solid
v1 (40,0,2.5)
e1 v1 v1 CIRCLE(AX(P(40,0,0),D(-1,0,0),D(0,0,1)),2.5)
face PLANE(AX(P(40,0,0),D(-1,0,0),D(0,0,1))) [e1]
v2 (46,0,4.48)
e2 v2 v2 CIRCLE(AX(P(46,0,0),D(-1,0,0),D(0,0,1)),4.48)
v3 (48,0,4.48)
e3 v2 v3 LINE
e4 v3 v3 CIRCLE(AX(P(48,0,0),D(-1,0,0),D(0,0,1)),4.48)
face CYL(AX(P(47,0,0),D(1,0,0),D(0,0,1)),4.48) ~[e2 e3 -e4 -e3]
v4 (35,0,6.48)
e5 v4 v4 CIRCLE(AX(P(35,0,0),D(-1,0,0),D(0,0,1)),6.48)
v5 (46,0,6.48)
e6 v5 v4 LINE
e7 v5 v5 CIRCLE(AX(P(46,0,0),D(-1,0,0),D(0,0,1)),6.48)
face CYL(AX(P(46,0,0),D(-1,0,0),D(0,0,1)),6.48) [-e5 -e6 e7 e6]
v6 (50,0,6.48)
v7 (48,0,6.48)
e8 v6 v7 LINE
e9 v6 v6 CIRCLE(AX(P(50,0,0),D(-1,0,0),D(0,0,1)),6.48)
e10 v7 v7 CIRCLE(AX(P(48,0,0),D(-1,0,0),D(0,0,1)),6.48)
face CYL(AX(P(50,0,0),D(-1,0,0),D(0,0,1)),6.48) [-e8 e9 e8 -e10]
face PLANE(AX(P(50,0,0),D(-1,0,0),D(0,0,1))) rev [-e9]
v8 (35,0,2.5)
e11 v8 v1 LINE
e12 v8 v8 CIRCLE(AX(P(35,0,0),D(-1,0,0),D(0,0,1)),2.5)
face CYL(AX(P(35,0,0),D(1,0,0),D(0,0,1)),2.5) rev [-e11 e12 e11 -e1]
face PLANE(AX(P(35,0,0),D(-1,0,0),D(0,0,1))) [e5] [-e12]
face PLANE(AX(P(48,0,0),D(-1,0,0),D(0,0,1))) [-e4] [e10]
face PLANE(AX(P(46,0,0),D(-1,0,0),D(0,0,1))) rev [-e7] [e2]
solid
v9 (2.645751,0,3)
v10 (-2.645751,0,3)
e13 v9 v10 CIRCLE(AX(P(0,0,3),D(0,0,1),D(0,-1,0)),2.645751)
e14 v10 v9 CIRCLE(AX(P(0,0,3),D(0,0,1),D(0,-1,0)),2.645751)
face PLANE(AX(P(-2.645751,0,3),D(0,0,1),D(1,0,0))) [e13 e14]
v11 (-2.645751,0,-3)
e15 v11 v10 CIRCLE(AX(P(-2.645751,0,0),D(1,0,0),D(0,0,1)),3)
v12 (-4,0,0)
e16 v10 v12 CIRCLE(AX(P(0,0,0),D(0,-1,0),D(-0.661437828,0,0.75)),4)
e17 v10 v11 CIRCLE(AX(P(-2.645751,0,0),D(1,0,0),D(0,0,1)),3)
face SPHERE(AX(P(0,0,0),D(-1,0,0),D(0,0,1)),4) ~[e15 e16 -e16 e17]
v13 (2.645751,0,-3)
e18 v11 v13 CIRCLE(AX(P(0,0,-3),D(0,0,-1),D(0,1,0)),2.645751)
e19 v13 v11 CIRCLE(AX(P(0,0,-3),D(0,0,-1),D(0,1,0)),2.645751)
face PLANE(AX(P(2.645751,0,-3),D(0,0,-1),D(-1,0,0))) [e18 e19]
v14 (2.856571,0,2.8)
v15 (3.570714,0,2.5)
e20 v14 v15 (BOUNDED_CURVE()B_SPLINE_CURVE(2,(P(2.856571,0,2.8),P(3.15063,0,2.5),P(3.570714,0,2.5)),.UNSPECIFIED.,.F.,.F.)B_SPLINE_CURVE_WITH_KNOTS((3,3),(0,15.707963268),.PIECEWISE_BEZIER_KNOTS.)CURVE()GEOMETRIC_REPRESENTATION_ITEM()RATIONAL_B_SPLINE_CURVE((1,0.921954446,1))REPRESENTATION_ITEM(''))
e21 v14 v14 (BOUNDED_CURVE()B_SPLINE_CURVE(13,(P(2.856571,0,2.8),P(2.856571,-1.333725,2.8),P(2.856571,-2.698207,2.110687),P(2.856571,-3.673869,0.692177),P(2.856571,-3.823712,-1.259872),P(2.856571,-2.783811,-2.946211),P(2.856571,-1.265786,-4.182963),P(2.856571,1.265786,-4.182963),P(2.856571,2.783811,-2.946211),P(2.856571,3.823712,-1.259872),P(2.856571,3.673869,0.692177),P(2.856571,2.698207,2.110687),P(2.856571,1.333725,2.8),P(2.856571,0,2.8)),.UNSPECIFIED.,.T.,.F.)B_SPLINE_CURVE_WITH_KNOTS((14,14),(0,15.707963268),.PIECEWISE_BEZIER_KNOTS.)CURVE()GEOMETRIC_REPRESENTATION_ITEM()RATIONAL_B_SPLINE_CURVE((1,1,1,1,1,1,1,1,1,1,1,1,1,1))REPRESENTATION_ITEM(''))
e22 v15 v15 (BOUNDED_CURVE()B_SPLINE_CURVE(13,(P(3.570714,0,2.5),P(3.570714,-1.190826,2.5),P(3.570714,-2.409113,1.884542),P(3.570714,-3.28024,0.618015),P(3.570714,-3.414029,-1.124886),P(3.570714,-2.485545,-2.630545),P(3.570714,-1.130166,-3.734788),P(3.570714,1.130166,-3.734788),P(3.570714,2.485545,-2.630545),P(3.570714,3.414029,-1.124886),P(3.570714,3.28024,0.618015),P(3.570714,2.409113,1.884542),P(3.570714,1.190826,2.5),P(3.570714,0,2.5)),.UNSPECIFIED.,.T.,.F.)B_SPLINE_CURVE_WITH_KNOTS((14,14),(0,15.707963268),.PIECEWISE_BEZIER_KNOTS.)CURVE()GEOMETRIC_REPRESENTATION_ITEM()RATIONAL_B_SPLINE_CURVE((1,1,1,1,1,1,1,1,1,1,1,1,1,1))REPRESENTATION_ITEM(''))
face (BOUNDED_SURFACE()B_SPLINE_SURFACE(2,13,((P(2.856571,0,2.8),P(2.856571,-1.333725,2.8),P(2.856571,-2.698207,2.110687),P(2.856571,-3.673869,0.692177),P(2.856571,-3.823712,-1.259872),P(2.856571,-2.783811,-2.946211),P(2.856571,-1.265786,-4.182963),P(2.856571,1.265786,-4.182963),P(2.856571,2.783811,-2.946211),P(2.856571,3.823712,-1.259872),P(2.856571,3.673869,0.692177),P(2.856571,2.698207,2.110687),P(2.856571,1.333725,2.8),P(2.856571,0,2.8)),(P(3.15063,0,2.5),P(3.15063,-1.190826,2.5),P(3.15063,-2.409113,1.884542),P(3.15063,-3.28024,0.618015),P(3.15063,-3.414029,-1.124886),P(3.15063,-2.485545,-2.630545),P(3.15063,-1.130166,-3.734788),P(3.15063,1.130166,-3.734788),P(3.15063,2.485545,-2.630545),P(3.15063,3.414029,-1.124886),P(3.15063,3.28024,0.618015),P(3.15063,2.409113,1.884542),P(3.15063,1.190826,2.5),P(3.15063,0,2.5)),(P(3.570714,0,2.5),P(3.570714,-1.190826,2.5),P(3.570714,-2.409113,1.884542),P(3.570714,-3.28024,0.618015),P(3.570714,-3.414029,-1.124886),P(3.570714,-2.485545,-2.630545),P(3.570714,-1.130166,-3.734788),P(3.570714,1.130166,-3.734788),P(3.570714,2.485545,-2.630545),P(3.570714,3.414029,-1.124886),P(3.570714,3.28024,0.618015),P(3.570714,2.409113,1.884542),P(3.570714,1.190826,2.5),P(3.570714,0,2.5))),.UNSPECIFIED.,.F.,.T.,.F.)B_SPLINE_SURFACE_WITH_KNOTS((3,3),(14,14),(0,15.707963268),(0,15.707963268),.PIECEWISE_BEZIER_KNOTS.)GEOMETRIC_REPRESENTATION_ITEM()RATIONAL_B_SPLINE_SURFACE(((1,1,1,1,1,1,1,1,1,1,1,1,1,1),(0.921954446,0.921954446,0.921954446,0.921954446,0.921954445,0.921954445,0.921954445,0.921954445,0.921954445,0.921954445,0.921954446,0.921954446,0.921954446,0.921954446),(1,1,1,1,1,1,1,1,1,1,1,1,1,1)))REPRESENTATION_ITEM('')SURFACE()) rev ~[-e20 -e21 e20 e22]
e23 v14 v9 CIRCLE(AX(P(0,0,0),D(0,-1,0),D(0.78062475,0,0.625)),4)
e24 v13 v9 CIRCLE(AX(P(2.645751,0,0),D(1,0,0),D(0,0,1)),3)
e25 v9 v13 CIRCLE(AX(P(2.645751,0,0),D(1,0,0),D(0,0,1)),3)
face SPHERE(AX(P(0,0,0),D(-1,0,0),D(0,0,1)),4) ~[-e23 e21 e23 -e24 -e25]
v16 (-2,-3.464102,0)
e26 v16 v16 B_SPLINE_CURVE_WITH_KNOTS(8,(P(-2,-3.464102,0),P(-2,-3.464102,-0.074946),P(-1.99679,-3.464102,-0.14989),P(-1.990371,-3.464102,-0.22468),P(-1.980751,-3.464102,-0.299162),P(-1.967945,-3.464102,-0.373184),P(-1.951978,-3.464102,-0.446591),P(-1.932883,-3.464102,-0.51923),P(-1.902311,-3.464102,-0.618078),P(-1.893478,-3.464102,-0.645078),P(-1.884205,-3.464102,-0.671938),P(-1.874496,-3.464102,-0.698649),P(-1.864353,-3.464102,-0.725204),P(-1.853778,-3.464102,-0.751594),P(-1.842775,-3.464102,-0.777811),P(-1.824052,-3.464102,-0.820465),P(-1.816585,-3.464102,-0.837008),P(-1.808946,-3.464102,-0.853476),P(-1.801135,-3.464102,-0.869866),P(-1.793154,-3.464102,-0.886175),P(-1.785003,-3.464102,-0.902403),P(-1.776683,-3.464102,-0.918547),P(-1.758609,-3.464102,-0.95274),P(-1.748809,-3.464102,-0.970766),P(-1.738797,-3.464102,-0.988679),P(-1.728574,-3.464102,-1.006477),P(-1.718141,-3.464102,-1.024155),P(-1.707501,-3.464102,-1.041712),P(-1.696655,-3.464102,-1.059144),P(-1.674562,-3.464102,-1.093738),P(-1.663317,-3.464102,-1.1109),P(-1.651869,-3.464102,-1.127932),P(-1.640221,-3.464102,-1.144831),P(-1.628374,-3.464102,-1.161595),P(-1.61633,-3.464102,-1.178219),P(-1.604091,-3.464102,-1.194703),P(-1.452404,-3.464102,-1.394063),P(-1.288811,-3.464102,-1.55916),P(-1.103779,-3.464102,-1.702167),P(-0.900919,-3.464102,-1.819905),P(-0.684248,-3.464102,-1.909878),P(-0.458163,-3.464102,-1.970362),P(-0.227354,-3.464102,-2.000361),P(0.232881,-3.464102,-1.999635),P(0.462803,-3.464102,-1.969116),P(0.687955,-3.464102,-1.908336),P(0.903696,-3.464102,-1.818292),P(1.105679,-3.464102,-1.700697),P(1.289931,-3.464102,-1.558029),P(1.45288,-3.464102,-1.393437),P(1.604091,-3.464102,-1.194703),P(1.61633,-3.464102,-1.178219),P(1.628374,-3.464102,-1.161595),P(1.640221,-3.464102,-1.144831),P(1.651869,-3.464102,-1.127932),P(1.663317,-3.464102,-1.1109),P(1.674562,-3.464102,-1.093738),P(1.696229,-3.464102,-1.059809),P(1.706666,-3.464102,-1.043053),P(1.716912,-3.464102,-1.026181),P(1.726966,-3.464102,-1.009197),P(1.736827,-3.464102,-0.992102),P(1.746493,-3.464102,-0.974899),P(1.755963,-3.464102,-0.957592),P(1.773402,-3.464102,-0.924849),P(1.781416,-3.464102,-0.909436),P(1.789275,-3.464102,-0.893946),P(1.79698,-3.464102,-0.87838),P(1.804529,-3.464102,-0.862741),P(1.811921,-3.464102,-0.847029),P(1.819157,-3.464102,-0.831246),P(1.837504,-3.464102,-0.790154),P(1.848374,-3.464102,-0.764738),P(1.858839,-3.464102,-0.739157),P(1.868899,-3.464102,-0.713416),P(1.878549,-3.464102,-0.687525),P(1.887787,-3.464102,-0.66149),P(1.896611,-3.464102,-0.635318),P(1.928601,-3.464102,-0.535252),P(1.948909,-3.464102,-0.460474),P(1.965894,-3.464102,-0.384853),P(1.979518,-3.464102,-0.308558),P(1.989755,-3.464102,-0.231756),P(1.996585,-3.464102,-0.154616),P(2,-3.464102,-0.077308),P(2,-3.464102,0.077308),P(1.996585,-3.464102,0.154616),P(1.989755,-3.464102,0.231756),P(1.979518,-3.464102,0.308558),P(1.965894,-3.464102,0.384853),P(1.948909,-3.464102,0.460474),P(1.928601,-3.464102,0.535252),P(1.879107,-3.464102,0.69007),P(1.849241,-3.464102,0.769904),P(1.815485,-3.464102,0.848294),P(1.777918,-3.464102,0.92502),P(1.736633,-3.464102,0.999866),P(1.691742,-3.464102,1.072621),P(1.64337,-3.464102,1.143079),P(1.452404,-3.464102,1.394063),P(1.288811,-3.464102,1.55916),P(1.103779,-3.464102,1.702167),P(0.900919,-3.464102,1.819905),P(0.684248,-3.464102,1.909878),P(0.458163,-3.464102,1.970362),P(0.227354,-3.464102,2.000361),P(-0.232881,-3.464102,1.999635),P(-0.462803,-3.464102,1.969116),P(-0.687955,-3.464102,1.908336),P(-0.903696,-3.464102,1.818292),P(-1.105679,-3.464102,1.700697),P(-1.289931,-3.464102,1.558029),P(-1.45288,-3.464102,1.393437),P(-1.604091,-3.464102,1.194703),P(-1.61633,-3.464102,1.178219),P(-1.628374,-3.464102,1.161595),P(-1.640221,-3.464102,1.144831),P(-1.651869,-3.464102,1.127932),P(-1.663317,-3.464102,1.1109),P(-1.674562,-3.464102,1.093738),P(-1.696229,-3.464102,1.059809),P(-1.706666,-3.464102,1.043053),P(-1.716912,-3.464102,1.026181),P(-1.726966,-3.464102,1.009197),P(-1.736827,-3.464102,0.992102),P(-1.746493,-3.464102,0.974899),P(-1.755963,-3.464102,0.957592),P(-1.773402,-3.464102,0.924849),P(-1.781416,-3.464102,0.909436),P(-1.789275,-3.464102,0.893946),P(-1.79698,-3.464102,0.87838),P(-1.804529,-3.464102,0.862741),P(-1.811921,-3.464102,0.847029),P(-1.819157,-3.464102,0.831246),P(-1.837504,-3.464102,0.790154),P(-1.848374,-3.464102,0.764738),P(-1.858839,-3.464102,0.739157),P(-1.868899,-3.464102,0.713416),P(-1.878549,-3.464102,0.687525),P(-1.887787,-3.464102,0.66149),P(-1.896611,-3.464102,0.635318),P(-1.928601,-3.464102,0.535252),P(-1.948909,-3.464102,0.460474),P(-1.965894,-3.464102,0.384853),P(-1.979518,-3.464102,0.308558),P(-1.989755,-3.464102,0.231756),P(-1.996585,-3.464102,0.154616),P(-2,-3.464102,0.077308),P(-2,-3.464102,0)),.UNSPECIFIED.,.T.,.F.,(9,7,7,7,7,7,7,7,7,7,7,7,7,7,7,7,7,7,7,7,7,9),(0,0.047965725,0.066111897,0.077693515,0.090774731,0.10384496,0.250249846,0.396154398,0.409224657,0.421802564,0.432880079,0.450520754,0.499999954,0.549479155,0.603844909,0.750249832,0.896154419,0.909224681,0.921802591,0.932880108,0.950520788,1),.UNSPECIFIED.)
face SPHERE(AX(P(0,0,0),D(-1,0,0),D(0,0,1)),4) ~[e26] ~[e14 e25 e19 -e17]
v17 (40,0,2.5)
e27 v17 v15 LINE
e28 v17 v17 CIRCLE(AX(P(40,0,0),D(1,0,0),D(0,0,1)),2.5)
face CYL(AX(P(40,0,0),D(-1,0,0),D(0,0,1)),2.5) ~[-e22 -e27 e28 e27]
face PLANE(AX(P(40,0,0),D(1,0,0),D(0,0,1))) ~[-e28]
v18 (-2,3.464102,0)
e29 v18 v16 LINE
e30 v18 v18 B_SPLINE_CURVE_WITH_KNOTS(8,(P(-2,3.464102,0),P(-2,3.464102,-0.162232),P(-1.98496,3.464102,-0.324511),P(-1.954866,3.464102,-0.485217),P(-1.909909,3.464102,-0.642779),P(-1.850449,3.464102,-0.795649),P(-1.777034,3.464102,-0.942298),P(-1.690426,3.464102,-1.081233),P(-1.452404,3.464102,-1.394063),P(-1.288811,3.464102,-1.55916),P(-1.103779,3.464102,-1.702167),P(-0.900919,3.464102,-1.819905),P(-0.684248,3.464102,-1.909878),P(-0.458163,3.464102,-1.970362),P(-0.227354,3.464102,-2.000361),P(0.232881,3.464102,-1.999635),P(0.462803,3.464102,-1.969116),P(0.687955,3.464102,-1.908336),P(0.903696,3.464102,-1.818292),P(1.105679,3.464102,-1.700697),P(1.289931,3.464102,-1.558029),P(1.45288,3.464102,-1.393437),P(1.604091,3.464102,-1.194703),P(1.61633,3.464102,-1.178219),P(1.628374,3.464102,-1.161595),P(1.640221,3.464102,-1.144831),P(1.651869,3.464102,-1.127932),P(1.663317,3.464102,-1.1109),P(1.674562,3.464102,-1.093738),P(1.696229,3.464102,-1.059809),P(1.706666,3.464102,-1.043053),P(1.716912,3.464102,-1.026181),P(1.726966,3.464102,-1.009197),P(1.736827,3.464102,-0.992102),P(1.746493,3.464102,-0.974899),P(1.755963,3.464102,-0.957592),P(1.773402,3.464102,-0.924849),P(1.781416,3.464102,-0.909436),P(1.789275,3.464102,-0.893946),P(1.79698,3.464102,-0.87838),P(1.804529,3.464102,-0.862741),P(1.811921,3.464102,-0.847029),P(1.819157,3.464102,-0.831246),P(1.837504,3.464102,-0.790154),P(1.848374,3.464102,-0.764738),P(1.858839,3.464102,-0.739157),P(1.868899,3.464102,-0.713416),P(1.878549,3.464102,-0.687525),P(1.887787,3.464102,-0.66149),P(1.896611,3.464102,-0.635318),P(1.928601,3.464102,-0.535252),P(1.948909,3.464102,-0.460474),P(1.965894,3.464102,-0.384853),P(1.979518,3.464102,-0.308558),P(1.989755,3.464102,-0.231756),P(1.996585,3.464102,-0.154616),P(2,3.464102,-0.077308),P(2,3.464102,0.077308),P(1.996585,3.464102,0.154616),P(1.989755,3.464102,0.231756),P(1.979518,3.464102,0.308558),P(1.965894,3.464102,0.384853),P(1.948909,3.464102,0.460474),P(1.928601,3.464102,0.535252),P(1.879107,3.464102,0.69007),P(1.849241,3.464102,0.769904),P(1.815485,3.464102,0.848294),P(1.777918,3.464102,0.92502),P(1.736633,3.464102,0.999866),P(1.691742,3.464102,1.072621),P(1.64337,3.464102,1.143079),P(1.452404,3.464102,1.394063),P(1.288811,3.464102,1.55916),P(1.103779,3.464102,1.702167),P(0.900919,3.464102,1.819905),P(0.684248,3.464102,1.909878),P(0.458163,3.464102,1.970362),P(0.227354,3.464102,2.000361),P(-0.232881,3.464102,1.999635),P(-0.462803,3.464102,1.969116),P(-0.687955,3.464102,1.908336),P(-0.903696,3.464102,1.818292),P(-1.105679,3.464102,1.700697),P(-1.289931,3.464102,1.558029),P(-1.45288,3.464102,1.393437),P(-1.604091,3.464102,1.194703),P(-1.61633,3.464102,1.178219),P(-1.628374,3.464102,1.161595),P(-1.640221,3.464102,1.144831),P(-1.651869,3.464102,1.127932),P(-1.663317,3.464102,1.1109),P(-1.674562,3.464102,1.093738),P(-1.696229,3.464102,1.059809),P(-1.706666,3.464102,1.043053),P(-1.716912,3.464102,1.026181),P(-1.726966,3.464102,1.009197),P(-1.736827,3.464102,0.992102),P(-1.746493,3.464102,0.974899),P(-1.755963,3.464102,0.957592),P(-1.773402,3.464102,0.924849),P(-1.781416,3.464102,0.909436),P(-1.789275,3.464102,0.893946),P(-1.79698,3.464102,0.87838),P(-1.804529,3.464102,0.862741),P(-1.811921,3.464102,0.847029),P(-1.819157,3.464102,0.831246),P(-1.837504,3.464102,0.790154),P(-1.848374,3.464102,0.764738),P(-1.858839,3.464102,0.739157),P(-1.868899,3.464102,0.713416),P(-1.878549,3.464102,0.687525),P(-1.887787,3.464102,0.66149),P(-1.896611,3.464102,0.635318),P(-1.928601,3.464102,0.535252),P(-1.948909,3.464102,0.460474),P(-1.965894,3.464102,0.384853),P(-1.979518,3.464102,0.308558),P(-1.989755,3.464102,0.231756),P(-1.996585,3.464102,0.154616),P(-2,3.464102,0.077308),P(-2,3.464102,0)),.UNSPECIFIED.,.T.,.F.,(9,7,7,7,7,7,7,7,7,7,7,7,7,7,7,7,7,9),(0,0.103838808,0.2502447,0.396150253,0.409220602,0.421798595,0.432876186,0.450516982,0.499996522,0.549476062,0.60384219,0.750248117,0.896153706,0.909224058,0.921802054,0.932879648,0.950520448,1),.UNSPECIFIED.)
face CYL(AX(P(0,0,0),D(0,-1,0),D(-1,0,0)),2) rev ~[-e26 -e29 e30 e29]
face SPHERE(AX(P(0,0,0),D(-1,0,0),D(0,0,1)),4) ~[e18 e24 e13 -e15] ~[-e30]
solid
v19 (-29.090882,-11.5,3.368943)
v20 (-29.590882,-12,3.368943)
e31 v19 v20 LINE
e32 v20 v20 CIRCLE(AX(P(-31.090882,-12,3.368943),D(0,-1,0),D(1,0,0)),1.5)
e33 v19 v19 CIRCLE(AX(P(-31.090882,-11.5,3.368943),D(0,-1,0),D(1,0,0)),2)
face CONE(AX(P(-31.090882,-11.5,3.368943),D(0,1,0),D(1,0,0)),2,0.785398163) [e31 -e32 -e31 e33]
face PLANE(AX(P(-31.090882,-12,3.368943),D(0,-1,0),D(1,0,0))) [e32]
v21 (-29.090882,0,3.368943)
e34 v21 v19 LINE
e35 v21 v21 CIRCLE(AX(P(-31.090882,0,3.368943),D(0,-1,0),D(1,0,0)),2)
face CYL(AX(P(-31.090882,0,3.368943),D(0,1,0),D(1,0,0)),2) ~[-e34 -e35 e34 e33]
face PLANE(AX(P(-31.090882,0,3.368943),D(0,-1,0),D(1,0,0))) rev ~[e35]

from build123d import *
from build123d import SkipClean  # not in build123d's __all__

# Parameters (mm, degrees)
F0_W     = 5
F0_H     = 2.5
F2_DEPTH = 12.5
F3_R     = 1
F4_W     = 2
F4_H     = 4.48
F0_R     = 2
F6_DEPTH = 12
F7_SIZE  = 0.5


with BuildPart() as f1:
    # F0 (on Front) → F1 (revolve)
    with BuildSketch(Plane.XZ):
        with BuildLine():
            ThreePointArc((2.6457513111, 3), (0, 4), (-2.6457513111, 3))
            Line((-2.6457513111, 3), (2.6457513111, 3))
        make_face()
        with BuildLine():
            ThreePointArc((-2, 0), (0, 2), (2, 0))
            Line((2, 0), (4, 0))
            ThreePointArc((4, 0), (3.7742546282, 1.3247648854), (3.1224989992, 2.5))
            ThreePointArc((3.1224989992, 2.5), (2.894940053, 2.7603119551), (2.6457513111, 3))
            Line((2.6457513111, 3), (-2.6457513111, 3))
            ThreePointArc((-2.6457513111, 3), (-3.6457513111, 1.6457513111), (-4, 0))
            Line((-4, 0), (-2, 0))
        make_face()
        with BuildLine():
            ThreePointArc((3.1224989992, 2.5), (3.7742546282, 1.3247648854), (4, 0))
            Line((4, 0), (35, 0))
            Line((35, 0), (35, 2.5))
            Line((35, 2.5), (3.1224989992, 2.5))
        make_face()
        with BuildLine():
            Line((-2, 0), (0, 0))
            Line((0, 0), (2, 0))
            ThreePointArc((2, 0), (0, 2), (-2, 0))
        make_face()
        with Locations((37.5, 1.25)):
            Rectangle(F0_W, F0_H)
    revolve(axis=Axis((25.0713285059, 0, 0), (1, 0, 0)))

    # F0 (on Front) → F2 (cut, symmetric)
    with BuildSketch(Plane.XZ):
        with BuildLine():
            ThreePointArc((2.6457513111, 3), (0, 4), (-2.6457513111, 3))
            Line((-2.6457513111, 3), (2.6457513111, 3))
        make_face()
        with BuildLine():
            Line((2.6457513111, -3), (-2.6457513111, -3))
            ThreePointArc((-2.6457513111, -3), (0, -4), (2.6457513111, -3))
        make_face()
        with BuildLine():
            Line((-2, 0), (0, 0))
            Line((0, 0), (2, 0))
            ThreePointArc((2, 0), (0, 2), (-2, 0))
        make_face()
        with BuildLine():
            Line((2, 0), (0, 0))
            Line((0, 0), (-2, 0))
            ThreePointArc((-2, 0), (0, -2), (2, 0))
        make_face()
    with SkipClean():  # cleaning this boolean's faces spoils the solid; the shape is the same uncleaned
        extrude(amount=F2_DEPTH, both=True, mode=Mode.SUBTRACT)

    # F3
    f3_edges = [f1.edges().sort_by_distance(p)[0] for p in [
        (3.122499, 0, -2.5),
    ]]
    fillet(f3_edges, radius=F3_R)


with BuildPart() as f5:
    # F4 (on Front) → F5 (revolve)
    with BuildSketch(Plane.XZ):
        Polygon((50, 6.48), (48, 6.48), (48, 4.48), (48, 0), (50, 0), align=None)
        with Locations((47, 2.24)):
            Rectangle(F4_W, F4_H)
        Polygon((35, 6.48), (35, 2.5), (40, 2.5), (40, 0), (46, 0), (46, 4.48), (46, 6.48), align=None)
    revolve(axis=Axis((42.5, 0, 0), (-1, 0, 0)))


with BuildPart() as f6:
    # F0 (on Front) → F6 (new body)
    with BuildSketch(Plane.XZ):
        with Locations((-31.0908816755, 3.3689432312)):
            Circle(F0_R)
    extrude(amount=F6_DEPTH)

    # F7
    f7_edges = [f6.edges().sort_by_distance(p)[0] for p in [
        (-33.090882, -12, 3.368943),
    ]]
    chamfer(f7_edges, length=F7_SIZE)


solid = Compound([f1.part, f5.part, f6.part])
